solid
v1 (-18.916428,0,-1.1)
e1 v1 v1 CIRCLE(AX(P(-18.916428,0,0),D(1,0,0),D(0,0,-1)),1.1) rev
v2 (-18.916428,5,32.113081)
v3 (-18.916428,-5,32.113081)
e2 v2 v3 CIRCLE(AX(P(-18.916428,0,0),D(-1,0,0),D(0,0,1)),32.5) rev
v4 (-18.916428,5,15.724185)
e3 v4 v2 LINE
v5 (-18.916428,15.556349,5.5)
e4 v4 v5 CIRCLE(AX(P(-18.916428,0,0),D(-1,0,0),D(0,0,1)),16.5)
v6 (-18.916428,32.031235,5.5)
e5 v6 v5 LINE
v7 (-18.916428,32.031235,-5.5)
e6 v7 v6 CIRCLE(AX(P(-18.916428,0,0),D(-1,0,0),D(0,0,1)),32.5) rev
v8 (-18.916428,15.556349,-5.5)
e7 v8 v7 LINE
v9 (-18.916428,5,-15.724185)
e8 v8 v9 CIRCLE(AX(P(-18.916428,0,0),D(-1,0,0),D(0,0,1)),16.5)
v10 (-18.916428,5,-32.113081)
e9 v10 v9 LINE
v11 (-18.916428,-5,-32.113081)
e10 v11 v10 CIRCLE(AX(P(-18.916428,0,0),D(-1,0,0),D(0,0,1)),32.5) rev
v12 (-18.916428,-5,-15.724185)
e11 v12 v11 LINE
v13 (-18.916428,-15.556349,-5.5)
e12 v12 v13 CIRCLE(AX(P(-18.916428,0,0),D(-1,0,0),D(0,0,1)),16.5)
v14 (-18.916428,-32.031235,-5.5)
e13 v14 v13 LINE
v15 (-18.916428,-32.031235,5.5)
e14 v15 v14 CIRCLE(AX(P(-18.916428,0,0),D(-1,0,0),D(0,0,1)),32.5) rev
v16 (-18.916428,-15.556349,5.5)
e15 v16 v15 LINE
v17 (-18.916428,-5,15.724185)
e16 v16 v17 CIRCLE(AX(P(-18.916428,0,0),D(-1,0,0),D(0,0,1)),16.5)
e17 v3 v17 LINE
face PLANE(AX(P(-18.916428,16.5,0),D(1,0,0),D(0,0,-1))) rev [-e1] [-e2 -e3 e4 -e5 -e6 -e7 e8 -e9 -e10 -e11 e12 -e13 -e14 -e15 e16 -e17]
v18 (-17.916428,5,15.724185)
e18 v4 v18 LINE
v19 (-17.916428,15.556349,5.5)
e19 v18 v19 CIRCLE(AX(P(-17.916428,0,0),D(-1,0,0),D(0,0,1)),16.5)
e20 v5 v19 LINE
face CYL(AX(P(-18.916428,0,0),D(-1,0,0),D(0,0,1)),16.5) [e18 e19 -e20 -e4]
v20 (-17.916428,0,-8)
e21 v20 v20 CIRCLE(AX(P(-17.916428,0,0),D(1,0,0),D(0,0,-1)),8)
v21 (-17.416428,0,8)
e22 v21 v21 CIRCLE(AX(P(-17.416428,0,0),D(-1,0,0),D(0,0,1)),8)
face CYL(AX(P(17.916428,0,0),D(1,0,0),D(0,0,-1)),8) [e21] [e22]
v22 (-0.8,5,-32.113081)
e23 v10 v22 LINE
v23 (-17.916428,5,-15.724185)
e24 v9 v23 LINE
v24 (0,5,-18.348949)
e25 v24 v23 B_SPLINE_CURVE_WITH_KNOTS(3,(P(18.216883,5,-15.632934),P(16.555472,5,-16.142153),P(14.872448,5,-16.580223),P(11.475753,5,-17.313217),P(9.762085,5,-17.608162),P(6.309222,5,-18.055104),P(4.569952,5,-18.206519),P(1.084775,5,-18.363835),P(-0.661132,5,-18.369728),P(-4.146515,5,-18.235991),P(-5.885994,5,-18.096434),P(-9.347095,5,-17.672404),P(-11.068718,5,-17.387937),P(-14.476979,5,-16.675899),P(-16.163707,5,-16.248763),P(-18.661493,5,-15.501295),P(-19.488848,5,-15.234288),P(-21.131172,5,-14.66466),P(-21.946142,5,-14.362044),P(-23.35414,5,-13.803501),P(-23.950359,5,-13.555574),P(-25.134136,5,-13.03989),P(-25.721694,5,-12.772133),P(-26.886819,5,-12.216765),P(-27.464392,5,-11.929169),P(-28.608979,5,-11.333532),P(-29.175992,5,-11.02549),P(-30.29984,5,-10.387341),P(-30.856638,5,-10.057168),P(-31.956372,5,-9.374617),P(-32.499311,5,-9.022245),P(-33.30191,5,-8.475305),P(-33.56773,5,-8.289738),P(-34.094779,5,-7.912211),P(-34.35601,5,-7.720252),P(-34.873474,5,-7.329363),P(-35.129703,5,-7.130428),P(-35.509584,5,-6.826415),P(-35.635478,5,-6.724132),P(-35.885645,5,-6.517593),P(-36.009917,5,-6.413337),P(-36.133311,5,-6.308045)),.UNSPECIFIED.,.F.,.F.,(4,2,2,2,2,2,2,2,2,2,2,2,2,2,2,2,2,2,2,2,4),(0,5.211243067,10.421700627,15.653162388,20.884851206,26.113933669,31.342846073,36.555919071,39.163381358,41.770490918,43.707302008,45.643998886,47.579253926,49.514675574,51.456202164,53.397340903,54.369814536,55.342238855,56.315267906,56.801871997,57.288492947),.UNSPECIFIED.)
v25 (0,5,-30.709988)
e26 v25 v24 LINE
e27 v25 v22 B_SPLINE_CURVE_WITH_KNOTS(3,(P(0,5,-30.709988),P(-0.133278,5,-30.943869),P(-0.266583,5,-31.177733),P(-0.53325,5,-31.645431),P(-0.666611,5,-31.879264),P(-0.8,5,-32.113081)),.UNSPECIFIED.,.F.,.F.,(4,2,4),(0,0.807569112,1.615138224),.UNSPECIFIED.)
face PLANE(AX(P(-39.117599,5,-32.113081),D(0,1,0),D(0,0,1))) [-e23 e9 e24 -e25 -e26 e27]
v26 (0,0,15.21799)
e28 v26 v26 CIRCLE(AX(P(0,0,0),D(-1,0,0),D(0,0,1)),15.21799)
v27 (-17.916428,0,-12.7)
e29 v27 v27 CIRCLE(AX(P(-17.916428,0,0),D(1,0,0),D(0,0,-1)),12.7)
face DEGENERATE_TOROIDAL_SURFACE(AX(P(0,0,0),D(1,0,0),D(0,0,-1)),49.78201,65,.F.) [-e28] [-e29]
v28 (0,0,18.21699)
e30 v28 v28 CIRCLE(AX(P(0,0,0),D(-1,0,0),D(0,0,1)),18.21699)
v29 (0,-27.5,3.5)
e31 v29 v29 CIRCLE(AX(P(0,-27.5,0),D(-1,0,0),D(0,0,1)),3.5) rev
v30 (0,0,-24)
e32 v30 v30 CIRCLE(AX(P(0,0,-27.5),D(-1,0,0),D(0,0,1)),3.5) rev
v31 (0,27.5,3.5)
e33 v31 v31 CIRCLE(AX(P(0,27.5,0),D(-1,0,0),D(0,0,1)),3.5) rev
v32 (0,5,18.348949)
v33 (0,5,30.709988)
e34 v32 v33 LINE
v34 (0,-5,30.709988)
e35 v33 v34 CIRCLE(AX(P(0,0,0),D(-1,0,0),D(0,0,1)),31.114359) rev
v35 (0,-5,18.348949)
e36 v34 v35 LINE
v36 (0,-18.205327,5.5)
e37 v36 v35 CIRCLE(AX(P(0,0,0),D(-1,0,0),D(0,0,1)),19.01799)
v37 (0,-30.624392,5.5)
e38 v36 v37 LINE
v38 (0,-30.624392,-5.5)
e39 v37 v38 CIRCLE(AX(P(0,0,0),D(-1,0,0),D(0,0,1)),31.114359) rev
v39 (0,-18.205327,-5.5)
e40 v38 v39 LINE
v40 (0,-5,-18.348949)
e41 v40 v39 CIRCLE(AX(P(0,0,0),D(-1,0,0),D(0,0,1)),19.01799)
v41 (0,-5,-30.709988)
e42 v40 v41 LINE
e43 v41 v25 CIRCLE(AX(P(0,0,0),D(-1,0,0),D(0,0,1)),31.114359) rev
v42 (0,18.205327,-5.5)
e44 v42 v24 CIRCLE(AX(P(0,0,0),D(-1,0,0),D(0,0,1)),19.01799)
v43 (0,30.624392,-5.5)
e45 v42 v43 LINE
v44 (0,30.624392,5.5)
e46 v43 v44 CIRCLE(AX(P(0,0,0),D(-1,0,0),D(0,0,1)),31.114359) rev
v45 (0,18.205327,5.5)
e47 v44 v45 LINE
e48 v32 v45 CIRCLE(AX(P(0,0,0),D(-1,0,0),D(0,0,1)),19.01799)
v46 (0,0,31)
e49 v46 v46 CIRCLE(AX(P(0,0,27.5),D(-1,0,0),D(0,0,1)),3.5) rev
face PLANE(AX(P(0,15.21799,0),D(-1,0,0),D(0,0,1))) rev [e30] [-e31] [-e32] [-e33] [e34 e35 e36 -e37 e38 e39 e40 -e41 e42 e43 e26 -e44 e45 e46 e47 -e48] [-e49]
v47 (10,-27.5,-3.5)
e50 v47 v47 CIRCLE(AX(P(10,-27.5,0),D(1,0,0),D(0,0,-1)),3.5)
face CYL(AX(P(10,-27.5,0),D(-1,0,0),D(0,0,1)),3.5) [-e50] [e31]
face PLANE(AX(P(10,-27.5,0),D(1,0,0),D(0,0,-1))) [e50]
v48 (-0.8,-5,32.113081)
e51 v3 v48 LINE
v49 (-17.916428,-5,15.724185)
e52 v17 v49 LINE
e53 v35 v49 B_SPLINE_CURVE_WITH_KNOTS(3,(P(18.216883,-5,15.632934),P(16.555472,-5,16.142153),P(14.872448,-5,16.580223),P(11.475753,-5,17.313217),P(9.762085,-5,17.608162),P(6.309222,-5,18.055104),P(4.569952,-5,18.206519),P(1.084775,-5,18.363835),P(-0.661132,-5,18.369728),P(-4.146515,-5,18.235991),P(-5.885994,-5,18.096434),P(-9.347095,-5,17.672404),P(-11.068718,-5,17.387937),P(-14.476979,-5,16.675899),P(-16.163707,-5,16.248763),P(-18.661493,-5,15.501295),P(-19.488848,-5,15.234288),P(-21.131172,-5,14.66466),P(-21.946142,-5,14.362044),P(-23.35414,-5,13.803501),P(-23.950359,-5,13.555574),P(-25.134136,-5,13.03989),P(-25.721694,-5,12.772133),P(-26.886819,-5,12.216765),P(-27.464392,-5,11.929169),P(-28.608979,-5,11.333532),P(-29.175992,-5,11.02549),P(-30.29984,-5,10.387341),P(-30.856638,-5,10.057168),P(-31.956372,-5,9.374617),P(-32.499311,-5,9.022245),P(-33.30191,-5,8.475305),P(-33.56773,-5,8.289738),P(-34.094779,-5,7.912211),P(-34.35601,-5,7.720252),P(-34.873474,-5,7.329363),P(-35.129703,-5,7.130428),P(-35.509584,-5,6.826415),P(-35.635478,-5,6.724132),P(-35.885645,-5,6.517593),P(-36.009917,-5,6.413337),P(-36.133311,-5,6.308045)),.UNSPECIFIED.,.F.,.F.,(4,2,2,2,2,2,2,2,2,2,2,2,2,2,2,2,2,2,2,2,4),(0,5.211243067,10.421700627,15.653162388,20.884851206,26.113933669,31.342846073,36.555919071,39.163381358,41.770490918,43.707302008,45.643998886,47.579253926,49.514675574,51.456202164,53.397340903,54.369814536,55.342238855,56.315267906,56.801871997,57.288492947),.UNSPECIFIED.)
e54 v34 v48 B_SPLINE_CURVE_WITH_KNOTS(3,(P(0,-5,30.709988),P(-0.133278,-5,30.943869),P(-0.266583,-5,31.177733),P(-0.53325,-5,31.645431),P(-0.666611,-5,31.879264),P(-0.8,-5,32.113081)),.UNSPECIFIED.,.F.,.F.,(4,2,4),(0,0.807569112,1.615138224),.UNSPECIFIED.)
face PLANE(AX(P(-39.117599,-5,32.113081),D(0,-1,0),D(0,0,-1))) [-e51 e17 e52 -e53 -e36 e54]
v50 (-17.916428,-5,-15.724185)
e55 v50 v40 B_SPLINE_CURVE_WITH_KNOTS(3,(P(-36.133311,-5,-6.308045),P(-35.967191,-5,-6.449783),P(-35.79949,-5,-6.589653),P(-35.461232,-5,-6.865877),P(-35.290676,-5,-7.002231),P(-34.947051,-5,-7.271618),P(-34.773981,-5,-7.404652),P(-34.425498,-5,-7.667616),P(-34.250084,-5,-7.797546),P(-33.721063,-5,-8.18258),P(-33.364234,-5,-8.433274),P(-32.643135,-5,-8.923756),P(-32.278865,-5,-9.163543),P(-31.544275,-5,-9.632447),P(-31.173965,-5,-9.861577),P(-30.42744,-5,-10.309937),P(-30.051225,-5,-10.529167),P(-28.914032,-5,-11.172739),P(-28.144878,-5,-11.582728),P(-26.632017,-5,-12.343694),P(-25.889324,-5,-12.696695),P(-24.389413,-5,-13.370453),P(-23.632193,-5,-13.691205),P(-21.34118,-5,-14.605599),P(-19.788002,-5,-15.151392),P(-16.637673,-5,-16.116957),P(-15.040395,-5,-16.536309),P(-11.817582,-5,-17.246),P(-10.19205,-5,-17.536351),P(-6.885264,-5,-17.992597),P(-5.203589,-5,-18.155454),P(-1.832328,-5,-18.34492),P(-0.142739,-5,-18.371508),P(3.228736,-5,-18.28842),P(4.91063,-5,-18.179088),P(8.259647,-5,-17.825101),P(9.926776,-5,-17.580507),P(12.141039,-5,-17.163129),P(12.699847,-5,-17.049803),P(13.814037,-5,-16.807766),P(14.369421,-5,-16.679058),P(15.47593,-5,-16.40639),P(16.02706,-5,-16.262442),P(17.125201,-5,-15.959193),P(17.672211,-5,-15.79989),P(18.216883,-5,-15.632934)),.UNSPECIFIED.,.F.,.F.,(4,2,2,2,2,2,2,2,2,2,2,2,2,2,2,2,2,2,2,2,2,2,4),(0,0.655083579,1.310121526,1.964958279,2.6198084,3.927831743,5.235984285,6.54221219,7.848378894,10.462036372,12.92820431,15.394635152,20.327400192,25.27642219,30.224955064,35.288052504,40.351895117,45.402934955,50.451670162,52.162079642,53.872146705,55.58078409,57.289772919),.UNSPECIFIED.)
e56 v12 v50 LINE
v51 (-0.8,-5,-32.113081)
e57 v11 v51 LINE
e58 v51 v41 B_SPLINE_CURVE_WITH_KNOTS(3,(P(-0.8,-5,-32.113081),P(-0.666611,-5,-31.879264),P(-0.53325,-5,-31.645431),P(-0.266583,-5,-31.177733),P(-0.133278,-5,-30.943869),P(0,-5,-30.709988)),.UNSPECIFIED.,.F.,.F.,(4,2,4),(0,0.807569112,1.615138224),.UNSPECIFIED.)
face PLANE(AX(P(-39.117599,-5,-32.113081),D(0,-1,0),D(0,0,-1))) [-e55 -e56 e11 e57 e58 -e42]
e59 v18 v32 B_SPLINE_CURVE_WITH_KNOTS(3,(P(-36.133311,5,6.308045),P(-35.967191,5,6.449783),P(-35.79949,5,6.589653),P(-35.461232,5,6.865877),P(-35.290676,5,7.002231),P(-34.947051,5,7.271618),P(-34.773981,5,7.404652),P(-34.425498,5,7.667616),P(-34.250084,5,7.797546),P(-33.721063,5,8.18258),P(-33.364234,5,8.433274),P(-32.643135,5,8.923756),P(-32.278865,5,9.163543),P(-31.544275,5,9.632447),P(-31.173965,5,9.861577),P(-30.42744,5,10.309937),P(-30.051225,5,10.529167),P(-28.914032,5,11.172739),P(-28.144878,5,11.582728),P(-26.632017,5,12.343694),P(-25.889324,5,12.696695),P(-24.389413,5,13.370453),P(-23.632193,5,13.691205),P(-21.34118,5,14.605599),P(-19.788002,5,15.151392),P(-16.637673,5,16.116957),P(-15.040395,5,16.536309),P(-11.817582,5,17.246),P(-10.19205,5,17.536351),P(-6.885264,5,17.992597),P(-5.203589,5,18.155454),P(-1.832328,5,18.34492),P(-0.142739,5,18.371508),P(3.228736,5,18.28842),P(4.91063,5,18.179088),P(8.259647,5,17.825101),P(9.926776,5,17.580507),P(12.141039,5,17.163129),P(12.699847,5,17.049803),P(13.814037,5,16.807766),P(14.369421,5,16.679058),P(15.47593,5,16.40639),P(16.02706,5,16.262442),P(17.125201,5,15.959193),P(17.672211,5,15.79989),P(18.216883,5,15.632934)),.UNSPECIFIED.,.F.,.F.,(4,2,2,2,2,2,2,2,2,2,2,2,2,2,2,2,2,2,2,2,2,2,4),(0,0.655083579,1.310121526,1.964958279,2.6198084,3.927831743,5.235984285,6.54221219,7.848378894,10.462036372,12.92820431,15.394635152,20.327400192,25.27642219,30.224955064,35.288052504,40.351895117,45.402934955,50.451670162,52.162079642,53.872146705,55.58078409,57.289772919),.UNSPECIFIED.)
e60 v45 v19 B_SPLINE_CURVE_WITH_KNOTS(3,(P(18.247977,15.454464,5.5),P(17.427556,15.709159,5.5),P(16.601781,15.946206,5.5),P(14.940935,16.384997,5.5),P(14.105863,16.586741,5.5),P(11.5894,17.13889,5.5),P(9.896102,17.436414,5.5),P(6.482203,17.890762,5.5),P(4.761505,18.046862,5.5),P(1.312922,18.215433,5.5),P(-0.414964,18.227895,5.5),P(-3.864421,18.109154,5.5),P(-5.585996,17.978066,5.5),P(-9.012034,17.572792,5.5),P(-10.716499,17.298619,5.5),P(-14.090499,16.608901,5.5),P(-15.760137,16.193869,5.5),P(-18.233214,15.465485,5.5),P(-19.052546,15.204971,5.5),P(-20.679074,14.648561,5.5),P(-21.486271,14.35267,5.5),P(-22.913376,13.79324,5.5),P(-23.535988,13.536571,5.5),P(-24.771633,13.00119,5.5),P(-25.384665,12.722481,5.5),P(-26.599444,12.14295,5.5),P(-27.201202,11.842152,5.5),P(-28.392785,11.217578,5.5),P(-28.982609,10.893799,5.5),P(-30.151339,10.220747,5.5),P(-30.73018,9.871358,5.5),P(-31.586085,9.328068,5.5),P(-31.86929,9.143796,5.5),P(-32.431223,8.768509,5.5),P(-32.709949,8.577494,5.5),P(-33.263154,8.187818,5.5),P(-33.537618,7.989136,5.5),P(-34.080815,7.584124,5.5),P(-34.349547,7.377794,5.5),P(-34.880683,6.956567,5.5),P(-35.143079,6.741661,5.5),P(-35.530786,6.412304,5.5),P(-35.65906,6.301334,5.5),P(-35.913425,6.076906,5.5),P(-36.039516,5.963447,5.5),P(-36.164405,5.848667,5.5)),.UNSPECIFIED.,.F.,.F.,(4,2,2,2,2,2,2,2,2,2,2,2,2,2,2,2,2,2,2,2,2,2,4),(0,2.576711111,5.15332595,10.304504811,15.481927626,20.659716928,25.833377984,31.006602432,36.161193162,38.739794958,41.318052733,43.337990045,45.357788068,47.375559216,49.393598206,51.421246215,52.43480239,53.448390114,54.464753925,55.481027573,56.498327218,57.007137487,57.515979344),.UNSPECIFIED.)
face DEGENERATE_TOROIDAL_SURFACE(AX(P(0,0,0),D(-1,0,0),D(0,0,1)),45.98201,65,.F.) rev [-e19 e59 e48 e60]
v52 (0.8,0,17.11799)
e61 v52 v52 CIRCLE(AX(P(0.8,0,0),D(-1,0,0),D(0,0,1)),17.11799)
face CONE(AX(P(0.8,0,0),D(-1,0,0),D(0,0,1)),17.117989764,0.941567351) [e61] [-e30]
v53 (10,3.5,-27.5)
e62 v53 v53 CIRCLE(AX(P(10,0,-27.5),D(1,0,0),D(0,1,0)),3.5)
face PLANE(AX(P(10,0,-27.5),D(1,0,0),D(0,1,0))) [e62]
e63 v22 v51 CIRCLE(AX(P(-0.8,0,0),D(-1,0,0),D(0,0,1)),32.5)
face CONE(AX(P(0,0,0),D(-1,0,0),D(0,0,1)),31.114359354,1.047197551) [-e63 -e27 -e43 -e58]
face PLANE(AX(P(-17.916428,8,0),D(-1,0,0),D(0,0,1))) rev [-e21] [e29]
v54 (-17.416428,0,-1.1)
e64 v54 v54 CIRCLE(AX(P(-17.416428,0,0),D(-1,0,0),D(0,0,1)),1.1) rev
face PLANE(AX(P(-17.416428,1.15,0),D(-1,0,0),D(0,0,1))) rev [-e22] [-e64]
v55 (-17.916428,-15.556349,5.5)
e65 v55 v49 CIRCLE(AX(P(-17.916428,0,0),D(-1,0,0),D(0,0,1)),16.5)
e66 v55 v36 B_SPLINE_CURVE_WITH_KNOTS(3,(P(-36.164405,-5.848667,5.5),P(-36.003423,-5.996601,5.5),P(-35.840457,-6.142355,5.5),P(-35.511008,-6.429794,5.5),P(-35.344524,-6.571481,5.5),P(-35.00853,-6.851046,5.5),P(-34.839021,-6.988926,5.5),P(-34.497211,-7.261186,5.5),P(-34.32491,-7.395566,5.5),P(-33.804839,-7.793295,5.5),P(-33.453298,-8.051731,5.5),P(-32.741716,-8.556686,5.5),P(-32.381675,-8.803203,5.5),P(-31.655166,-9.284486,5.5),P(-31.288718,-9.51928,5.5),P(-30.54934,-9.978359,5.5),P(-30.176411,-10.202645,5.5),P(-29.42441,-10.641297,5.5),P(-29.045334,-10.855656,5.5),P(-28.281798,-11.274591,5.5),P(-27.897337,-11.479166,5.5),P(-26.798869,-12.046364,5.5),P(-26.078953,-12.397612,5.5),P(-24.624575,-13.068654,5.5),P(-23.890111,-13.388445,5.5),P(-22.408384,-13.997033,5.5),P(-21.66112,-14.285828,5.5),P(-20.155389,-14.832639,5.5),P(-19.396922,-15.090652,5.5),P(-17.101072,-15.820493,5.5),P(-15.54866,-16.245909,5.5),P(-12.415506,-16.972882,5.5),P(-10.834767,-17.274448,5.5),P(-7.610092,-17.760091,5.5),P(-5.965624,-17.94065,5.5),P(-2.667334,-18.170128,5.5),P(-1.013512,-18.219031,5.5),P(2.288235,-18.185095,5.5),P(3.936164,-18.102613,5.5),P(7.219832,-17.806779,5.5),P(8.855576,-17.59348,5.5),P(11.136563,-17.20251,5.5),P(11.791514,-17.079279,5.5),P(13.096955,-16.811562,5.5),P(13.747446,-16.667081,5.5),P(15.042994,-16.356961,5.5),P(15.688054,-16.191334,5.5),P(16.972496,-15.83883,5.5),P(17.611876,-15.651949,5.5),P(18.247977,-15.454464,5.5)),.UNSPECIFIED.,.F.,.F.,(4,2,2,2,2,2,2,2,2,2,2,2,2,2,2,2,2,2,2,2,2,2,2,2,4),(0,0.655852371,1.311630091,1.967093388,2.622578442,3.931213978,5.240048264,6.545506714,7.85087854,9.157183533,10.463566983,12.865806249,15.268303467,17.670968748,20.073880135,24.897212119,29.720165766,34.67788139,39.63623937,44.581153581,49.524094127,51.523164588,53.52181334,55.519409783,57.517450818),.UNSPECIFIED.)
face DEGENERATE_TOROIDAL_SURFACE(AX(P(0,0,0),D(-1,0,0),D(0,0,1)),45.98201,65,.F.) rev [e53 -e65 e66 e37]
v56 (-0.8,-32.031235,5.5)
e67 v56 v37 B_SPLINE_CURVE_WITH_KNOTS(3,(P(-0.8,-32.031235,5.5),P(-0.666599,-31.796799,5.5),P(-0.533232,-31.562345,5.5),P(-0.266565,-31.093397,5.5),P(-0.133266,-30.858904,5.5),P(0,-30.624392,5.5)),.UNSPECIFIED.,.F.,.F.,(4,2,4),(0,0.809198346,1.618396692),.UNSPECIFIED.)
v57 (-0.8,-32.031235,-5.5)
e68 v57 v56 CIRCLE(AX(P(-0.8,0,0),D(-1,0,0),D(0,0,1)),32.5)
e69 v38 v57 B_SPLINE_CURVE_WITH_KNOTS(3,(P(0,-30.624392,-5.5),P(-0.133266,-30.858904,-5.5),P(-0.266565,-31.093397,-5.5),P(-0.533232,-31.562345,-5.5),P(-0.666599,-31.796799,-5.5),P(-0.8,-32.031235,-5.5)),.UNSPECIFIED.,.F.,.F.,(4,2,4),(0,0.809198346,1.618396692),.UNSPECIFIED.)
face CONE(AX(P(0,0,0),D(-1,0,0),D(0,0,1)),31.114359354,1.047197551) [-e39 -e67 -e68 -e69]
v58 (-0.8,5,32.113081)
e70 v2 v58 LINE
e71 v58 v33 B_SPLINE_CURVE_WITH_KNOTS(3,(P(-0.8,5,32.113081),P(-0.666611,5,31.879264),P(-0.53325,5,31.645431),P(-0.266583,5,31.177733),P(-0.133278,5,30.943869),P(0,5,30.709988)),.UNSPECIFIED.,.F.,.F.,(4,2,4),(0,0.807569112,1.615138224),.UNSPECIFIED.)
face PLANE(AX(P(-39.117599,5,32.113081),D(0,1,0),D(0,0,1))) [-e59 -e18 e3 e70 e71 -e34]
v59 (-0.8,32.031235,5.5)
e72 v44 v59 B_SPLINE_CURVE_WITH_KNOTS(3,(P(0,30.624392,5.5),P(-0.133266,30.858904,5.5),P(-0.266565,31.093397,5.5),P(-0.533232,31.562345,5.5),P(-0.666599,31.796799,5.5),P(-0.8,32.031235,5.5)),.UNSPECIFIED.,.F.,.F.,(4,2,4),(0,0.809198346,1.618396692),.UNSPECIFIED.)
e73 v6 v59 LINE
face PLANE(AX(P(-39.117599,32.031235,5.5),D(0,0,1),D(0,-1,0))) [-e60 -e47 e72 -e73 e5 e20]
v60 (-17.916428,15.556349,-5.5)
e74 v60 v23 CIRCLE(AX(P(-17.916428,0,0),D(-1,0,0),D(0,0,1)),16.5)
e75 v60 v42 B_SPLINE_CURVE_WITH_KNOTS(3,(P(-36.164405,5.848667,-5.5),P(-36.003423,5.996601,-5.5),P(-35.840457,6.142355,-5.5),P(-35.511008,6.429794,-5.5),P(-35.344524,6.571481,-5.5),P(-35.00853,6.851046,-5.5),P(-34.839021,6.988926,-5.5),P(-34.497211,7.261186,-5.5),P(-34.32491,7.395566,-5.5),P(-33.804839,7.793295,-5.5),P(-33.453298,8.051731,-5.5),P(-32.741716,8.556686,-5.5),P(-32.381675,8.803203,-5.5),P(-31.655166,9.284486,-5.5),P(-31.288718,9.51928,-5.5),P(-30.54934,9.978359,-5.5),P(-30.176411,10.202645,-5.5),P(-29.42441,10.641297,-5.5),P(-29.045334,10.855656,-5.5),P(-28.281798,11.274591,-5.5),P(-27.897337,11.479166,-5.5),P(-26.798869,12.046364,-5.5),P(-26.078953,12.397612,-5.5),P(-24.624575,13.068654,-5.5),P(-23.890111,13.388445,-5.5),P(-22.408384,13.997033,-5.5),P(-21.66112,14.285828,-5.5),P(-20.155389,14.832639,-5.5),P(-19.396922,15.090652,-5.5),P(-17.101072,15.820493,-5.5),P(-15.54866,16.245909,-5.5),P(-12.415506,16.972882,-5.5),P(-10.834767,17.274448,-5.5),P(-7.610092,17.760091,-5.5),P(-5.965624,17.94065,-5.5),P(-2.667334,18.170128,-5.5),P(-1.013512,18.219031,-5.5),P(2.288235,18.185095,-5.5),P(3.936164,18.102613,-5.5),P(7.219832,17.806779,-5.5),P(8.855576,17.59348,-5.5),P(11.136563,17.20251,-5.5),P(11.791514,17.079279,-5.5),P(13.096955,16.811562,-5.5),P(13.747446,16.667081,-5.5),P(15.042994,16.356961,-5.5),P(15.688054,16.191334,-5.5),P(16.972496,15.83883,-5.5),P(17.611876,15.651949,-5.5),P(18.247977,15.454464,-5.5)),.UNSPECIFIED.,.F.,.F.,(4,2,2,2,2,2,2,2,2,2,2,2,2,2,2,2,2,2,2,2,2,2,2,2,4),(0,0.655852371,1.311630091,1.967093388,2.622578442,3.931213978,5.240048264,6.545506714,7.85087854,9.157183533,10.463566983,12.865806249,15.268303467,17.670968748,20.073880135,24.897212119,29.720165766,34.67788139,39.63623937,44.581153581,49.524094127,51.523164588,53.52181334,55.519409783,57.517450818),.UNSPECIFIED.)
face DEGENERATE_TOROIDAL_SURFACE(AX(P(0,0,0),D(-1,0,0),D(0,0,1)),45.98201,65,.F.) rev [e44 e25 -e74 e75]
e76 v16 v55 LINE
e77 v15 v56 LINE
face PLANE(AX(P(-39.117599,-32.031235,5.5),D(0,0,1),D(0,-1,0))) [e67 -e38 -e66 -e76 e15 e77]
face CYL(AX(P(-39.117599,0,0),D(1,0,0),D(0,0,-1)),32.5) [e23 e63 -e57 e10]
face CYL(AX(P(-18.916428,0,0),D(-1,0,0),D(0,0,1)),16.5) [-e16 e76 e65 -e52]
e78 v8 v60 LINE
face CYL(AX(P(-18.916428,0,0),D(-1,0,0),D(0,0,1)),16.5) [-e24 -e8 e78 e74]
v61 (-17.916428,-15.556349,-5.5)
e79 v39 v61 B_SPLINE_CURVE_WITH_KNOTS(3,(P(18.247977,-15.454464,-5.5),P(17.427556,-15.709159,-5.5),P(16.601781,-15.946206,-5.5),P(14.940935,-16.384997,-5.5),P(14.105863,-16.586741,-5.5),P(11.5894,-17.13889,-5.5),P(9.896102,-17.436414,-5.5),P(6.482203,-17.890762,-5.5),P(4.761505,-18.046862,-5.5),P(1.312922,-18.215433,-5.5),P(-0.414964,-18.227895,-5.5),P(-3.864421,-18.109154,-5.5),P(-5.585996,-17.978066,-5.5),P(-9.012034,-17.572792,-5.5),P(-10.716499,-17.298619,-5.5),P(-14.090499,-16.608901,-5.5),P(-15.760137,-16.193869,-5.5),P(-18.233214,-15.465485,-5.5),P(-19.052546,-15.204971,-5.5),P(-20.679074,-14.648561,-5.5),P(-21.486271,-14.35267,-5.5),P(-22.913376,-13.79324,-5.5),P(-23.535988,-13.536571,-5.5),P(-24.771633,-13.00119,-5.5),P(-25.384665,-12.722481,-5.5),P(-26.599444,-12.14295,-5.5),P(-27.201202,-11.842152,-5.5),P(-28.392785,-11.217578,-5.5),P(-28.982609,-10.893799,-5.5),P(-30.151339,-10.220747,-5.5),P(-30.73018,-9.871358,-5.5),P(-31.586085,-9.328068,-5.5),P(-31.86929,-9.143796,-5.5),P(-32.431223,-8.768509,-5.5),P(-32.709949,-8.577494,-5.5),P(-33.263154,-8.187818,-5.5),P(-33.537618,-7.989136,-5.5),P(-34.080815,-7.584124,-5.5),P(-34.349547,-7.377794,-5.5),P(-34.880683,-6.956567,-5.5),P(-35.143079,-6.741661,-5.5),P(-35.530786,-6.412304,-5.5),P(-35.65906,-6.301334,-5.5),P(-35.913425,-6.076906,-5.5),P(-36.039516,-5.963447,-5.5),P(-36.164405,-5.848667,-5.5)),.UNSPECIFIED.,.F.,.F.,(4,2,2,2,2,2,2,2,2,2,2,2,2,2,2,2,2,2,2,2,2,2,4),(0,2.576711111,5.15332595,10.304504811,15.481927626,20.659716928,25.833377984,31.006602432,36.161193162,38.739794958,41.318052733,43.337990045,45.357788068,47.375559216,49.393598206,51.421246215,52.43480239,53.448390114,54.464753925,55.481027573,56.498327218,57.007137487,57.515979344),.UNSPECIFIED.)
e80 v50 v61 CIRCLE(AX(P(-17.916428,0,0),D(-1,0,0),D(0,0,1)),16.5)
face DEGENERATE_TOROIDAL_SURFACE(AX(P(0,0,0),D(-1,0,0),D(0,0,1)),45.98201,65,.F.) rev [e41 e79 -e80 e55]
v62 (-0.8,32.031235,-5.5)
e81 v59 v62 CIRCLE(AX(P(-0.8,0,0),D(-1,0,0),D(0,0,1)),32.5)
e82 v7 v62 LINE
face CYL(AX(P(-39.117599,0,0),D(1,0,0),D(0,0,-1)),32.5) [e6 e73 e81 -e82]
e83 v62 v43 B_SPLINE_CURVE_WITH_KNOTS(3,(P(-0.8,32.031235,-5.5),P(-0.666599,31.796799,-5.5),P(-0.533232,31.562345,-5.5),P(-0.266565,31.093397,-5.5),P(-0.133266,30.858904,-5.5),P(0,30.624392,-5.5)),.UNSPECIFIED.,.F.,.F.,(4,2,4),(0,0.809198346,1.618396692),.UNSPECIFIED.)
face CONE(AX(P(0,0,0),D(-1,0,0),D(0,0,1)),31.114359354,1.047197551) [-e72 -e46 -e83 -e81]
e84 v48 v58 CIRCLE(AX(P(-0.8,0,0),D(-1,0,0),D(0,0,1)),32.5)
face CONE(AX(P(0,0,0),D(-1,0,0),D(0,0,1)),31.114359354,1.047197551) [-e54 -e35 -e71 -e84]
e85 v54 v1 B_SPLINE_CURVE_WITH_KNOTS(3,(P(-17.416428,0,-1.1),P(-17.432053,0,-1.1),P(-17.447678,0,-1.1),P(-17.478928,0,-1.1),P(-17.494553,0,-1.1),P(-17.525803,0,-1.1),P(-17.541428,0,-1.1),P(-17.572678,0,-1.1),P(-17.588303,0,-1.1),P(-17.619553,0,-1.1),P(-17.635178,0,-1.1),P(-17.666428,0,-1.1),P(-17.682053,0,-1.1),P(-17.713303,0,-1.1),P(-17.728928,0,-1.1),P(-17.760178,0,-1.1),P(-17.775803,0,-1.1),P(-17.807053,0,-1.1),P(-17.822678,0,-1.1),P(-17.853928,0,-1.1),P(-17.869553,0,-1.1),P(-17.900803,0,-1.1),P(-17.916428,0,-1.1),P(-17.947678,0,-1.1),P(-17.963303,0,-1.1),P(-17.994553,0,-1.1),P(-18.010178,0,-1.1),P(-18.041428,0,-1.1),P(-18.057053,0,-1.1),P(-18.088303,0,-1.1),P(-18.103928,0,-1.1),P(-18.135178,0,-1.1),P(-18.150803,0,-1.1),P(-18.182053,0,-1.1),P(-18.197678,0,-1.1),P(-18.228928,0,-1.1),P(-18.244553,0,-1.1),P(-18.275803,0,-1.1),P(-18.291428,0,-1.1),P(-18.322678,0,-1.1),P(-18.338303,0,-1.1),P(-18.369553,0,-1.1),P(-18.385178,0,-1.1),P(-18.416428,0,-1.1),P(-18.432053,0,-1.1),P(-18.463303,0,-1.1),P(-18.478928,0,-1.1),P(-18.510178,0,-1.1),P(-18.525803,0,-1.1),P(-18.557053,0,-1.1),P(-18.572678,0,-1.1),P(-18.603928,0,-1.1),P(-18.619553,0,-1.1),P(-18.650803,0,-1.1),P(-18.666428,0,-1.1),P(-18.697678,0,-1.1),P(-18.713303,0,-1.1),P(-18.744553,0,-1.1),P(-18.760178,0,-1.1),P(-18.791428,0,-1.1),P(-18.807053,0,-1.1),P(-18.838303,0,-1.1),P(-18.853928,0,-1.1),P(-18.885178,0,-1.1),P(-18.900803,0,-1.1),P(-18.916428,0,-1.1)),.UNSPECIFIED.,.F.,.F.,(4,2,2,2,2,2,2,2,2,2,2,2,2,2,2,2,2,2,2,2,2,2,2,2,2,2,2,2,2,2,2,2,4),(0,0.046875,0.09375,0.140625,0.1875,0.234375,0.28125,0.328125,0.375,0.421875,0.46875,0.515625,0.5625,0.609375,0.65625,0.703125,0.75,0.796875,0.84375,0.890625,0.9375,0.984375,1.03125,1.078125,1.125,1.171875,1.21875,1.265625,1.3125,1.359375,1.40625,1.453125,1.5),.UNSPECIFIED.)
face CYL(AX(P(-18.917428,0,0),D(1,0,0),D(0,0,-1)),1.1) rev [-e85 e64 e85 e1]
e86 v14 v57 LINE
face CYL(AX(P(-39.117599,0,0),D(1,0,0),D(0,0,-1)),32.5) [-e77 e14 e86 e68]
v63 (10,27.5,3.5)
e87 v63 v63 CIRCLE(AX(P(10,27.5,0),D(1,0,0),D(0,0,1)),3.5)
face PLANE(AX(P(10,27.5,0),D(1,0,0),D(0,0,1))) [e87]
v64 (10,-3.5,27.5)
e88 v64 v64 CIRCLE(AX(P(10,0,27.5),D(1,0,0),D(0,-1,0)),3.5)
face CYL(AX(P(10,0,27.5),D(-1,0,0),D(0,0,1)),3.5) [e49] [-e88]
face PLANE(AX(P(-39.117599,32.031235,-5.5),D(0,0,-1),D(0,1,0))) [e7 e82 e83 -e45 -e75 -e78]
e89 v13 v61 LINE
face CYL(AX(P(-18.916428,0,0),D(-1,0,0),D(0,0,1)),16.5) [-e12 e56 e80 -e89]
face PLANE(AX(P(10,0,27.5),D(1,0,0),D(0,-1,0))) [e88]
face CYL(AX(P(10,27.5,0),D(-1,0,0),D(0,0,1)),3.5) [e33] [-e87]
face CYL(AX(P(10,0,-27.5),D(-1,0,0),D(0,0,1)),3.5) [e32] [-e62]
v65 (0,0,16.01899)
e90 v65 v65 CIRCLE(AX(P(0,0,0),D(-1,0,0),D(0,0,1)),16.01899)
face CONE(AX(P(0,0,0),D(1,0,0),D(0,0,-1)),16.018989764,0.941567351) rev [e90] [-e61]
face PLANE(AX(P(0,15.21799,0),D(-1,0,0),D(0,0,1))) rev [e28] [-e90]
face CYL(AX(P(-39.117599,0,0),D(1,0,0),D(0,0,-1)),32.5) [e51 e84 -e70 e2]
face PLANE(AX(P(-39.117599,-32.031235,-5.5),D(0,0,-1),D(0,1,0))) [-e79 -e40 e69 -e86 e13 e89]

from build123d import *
from OCP.BRepFilletAPI import BRepFilletAPI_MakeChamfer

# Parameters (mm, degrees)
BOSS_EXTRUDE1_DEPTH = 18.916428128
SKETCH3_R           = 1.15
CUT_EXTRUDE1_DEPTH  = 17.416428128
CUT_EXTRUDE3_REACH  = 51.702
SKETCH10_R          = 1.1
SKETCH8_R           = 3.5
BOSS_EXTRUDE2_DEPTH = 10
CIRPATTERN2_COUNT   = 4
CHAMFER1_SIZE       = 0.8
CHAMFER1_SIZE2      = 1.385640646


# Read off the part's stored shape, not the designer's step: Roller coating 12, Roller core 12 coated
with BuildPart() as part:
    # Roller coating 12 outline → Roller coating 12 (revolve)
    with BuildSketch(Plane.YX):
        with BuildLine():
            ThreePointArc((12.7, -17.916428128), (15.217989764, 0), (12.7, 17.916428128))
            Line((12.7, 17.916428128), (8, 17.916428128))
            Line((8, 17.916428128), (8, 17.416428128))
            Line((8, 17.416428128), (12.322080058, 17.416428128))
            ThreePointArc((12.322080058, 17.416428128), (14.717989764, 0), (12.322080058, -17.416428128))
            Line((12.322080058, -17.416428128), (8, -17.416428128))
            Line((8, -17.416428128), (8, -17.916428128))
            Line((8, -17.916428128), (12.7, -17.916428128))
        make_face()
    revolve(axis=Axis((0, 0, 0), (1, 0, 0)))


with BuildPart() as body_2:
    # Roller core 12 coated outline → Roller core 12 coated (revolve)
    with BuildSketch(Plane.YX):
        with BuildLine():
            Line((1.15, 17.416428128), (1.15, -17.416428128))
            Line((1.15, -17.416428128), (12.322080058, -17.416428128))
            ThreePointArc((12.322080058, -17.416428128), (14.717989764, 0), (12.322080058, 17.416428128))
            Line((12.322080058, 17.416428128), (1.15, 17.416428128))
        make_face()
    revolve(axis=Axis((0, 0, 0), (1, 0, 0)))


with BuildPart() as part_1:
    add(part.part)

    # Combine1: union body 2
    add(body_2.part)


with BuildPart() as body_2_2:
    # Sketch1 → Revolve1 (revolve)
    with BuildSketch(Plane.XY, mode=Mode.PRIVATE) as revolve1_sk:
        with BuildLine():
            Line((0, 0), (0, 15.217989764))
            Line((0, 15.217989764), (0, 19.017989764))
            ThreePointArc((0, 19.017989764), (-9.046251562, 18.385414232), (-17.916428128, 16.5))
            Line((-17.916428128, 16.5), (-18.916428128, 16.5))
            Line((-18.916428128, 16.5), (-18.916428128, 0))
            Line((-18.916428128, 0), (0, 0))
        make_face()
    revolve(revolve1_sk.sketch.rotate(Axis((-18.916428128, 0, 0), (1, 0, 0)), 270), axis=Axis((-18.916428128, 0, 0), (1, 0, 0)))

    # Sketch5 → Boss-Extrude1 (add)
    with BuildSketch(Plane(origin=(0, 0, 0), x_dir=(0, 0, -1), z_dir=(1, 0, 0))):
        with BuildLine():
            Line((5.5, -32.031234756), (5.5, -15.556349186))
            ThreePointArc((5.5, -15.556349186), (0, -16.5), (-5.5, -15.556349186))
            Line((-5.5, -15.556349186), (-5.5, -32.031234756))
            ThreePointArc((-5.5, -32.031234756), (0, -32.5), (5.5, -32.031234756))
        make_face()
        with BuildLine():
            Line((-5.5, 32.031234756), (-5.5, 15.556349186))
            ThreePointArc((-5.5, 15.556349186), (0, 16.5), (5.5, 15.556349186))
            Line((5.5, 15.556349186), (5.5, 32.031234756))
            ThreePointArc((5.5, 32.031234756), (0, 32.5), (-5.5, 32.031234756))
        make_face()
        with BuildLine():
            Line((32.113081447, 5), (15.724185194, 5))
            ThreePointArc((15.724185194, 5), (16.5, 0), (15.724185194, -5))
            Line((15.724185194, -5), (32.113081447, -5))
            ThreePointArc((32.113081447, -5), (32.5, 0), (32.113081447, 5))
        make_face()
        with BuildLine():
            Line((-32.113081447, -5), (-15.724185194, -5))
            ThreePointArc((-15.724185194, -5), (-16.5, 0), (-15.724185194, 5))
            Line((-15.724185194, 5), (-32.113081447, 5))
            ThreePointArc((-32.113081447, 5), (-32.5, 0), (-32.113081447, -5))
        make_face()
    extrude(amount=-BOSS_EXTRUDE1_DEPTH)

    # Combine2: cut part
    add(part_1.part, mode=Mode.SUBTRACT)

    # Sketch3 → Cut-Extrude1 (cut)
    with BuildSketch(Plane(origin=(0, 0, 0), x_dir=(0, 0, -1), z_dir=(1, 0, 0))):
        Circle(SKETCH3_R)
    extrude(amount=-CUT_EXTRUDE1_DEPTH, mode=Mode.SUBTRACT)

    # Sketch10 → Cut-Extrude3 (cut, up to next)
    with BuildSketch(Plane(origin=(0, 0, 0), x_dir=(0, 0, -1), z_dir=(1, 0, 0)), mode=Mode.PRIVATE) as cut_extrude3_sk1:
        Circle(SKETCH10_R)
    cut_extrude3_tool1 = extrude(cut_extrude3_sk1.sketch, amount=-CUT_EXTRUDE3_REACH, mode=Mode.PRIVATE) & body_2_2.part
    add(cut_extrude3_tool1.solids().sort_by_distance((0, 0, 0))[0], mode=Mode.SUBTRACT)

    # Sketch4 → Revolve2 (revolve)
    with BuildSketch(Plane.XY, mode=Mode.PRIVATE) as revolve2_sk:
        Polygon((0, 18.216989764), (0.8, 17.117989764), (0, 16.018989764), align=None)
    revolve(revolve2_sk.sketch.rotate(Axis((-18.916428128, 0, 0), (1, 0, 0)), 90), axis=Axis((-18.916428128, 0, 0), (1, 0, 0)))

    # Sketch8 → Boss-Extrude2 (add)
    with BuildSketch(Plane(origin=(0, 0, 0), x_dir=(0, 0, -1), z_dir=(1, 0, 0))):
        with Locations(Location((0, -27.5, 0), (0, 0, 180))):
            Circle(SKETCH8_R)
    boss_extrude2 = extrude(amount=BOSS_EXTRUDE2_DEPTH)

    # CirPattern2: Boss-Extrude2 ×4 about axis
    cirpattern2_axis = Axis((0, 0, 0), (1, 0, 0))
    for i in range(1, CIRPATTERN2_COUNT):
        add(boss_extrude2.rotate(cirpattern2_axis, i * 360 / CIRPATTERN2_COUNT))

    # Chamfer1: one chamfer whose edges measure the first distance from different faces: ONE call of the kernel's chamfer builder (chamfer() names one face for all edges)
    chamfer1_edges_1 = [body_2_2.edges().sort_by_distance(p)[0] for p in [
        (0, -32.5, 0),
    ]]
    chamfer1_side_1 = [body_2_2.faces().sort_by_distance(p)[0] for p in [
        (-9.458214064, -32.5, 0),
    ]]
    chamfer1_edges_2 = [body_2_2.edges().sort_by_distance(p)[0] for p in [
        (0, 0, -32.5),
    ]]
    chamfer1_side_2 = [body_2_2.faces().sort_by_distance(p)[0] for p in [
        (-9.458214064, 0, -32.5),
    ]]
    chamfer1_edges_3 = [body_2_2.edges().sort_by_distance(p)[0] for p in [
        (0, 32.5, 0),
    ]]
    chamfer1_side_3 = [body_2_2.faces().sort_by_distance(p)[0] for p in [
        (-9.458214064, 32.5, 0),
    ]]
    chamfer1_edges_4 = [body_2_2.edges().sort_by_distance(p)[0] for p in [
        (0, 0, 32.5),
    ]]
    chamfer1_side_4 = [body_2_2.faces().sort_by_distance(p)[0] for p in [
        (-9.458214064, 0, 32.5),
    ]]
    chamfer1 = BRepFilletAPI_MakeChamfer(body_2_2.part.solid().wrapped)
    for e in chamfer1_edges_1:
        chamfer1.Add(CHAMFER1_SIZE, CHAMFER1_SIZE2, e.wrapped, chamfer1_side_1[0].wrapped)  # the first distance lies on this face
    for e in chamfer1_edges_2:
        chamfer1.Add(CHAMFER1_SIZE, CHAMFER1_SIZE2, e.wrapped, chamfer1_side_2[0].wrapped)  # the first distance lies on this face
    for e in chamfer1_edges_3:
        chamfer1.Add(CHAMFER1_SIZE, CHAMFER1_SIZE2, e.wrapped, chamfer1_side_3[0].wrapped)  # the first distance lies on this face
    for e in chamfer1_edges_4:
        chamfer1.Add(CHAMFER1_SIZE, CHAMFER1_SIZE2, e.wrapped, chamfer1_side_4[0].wrapped)  # the first distance lies on this face
    add(Compound.cast(chamfer1.Shape()), mode=Mode.REPLACE)


solid = body_2_2.part
